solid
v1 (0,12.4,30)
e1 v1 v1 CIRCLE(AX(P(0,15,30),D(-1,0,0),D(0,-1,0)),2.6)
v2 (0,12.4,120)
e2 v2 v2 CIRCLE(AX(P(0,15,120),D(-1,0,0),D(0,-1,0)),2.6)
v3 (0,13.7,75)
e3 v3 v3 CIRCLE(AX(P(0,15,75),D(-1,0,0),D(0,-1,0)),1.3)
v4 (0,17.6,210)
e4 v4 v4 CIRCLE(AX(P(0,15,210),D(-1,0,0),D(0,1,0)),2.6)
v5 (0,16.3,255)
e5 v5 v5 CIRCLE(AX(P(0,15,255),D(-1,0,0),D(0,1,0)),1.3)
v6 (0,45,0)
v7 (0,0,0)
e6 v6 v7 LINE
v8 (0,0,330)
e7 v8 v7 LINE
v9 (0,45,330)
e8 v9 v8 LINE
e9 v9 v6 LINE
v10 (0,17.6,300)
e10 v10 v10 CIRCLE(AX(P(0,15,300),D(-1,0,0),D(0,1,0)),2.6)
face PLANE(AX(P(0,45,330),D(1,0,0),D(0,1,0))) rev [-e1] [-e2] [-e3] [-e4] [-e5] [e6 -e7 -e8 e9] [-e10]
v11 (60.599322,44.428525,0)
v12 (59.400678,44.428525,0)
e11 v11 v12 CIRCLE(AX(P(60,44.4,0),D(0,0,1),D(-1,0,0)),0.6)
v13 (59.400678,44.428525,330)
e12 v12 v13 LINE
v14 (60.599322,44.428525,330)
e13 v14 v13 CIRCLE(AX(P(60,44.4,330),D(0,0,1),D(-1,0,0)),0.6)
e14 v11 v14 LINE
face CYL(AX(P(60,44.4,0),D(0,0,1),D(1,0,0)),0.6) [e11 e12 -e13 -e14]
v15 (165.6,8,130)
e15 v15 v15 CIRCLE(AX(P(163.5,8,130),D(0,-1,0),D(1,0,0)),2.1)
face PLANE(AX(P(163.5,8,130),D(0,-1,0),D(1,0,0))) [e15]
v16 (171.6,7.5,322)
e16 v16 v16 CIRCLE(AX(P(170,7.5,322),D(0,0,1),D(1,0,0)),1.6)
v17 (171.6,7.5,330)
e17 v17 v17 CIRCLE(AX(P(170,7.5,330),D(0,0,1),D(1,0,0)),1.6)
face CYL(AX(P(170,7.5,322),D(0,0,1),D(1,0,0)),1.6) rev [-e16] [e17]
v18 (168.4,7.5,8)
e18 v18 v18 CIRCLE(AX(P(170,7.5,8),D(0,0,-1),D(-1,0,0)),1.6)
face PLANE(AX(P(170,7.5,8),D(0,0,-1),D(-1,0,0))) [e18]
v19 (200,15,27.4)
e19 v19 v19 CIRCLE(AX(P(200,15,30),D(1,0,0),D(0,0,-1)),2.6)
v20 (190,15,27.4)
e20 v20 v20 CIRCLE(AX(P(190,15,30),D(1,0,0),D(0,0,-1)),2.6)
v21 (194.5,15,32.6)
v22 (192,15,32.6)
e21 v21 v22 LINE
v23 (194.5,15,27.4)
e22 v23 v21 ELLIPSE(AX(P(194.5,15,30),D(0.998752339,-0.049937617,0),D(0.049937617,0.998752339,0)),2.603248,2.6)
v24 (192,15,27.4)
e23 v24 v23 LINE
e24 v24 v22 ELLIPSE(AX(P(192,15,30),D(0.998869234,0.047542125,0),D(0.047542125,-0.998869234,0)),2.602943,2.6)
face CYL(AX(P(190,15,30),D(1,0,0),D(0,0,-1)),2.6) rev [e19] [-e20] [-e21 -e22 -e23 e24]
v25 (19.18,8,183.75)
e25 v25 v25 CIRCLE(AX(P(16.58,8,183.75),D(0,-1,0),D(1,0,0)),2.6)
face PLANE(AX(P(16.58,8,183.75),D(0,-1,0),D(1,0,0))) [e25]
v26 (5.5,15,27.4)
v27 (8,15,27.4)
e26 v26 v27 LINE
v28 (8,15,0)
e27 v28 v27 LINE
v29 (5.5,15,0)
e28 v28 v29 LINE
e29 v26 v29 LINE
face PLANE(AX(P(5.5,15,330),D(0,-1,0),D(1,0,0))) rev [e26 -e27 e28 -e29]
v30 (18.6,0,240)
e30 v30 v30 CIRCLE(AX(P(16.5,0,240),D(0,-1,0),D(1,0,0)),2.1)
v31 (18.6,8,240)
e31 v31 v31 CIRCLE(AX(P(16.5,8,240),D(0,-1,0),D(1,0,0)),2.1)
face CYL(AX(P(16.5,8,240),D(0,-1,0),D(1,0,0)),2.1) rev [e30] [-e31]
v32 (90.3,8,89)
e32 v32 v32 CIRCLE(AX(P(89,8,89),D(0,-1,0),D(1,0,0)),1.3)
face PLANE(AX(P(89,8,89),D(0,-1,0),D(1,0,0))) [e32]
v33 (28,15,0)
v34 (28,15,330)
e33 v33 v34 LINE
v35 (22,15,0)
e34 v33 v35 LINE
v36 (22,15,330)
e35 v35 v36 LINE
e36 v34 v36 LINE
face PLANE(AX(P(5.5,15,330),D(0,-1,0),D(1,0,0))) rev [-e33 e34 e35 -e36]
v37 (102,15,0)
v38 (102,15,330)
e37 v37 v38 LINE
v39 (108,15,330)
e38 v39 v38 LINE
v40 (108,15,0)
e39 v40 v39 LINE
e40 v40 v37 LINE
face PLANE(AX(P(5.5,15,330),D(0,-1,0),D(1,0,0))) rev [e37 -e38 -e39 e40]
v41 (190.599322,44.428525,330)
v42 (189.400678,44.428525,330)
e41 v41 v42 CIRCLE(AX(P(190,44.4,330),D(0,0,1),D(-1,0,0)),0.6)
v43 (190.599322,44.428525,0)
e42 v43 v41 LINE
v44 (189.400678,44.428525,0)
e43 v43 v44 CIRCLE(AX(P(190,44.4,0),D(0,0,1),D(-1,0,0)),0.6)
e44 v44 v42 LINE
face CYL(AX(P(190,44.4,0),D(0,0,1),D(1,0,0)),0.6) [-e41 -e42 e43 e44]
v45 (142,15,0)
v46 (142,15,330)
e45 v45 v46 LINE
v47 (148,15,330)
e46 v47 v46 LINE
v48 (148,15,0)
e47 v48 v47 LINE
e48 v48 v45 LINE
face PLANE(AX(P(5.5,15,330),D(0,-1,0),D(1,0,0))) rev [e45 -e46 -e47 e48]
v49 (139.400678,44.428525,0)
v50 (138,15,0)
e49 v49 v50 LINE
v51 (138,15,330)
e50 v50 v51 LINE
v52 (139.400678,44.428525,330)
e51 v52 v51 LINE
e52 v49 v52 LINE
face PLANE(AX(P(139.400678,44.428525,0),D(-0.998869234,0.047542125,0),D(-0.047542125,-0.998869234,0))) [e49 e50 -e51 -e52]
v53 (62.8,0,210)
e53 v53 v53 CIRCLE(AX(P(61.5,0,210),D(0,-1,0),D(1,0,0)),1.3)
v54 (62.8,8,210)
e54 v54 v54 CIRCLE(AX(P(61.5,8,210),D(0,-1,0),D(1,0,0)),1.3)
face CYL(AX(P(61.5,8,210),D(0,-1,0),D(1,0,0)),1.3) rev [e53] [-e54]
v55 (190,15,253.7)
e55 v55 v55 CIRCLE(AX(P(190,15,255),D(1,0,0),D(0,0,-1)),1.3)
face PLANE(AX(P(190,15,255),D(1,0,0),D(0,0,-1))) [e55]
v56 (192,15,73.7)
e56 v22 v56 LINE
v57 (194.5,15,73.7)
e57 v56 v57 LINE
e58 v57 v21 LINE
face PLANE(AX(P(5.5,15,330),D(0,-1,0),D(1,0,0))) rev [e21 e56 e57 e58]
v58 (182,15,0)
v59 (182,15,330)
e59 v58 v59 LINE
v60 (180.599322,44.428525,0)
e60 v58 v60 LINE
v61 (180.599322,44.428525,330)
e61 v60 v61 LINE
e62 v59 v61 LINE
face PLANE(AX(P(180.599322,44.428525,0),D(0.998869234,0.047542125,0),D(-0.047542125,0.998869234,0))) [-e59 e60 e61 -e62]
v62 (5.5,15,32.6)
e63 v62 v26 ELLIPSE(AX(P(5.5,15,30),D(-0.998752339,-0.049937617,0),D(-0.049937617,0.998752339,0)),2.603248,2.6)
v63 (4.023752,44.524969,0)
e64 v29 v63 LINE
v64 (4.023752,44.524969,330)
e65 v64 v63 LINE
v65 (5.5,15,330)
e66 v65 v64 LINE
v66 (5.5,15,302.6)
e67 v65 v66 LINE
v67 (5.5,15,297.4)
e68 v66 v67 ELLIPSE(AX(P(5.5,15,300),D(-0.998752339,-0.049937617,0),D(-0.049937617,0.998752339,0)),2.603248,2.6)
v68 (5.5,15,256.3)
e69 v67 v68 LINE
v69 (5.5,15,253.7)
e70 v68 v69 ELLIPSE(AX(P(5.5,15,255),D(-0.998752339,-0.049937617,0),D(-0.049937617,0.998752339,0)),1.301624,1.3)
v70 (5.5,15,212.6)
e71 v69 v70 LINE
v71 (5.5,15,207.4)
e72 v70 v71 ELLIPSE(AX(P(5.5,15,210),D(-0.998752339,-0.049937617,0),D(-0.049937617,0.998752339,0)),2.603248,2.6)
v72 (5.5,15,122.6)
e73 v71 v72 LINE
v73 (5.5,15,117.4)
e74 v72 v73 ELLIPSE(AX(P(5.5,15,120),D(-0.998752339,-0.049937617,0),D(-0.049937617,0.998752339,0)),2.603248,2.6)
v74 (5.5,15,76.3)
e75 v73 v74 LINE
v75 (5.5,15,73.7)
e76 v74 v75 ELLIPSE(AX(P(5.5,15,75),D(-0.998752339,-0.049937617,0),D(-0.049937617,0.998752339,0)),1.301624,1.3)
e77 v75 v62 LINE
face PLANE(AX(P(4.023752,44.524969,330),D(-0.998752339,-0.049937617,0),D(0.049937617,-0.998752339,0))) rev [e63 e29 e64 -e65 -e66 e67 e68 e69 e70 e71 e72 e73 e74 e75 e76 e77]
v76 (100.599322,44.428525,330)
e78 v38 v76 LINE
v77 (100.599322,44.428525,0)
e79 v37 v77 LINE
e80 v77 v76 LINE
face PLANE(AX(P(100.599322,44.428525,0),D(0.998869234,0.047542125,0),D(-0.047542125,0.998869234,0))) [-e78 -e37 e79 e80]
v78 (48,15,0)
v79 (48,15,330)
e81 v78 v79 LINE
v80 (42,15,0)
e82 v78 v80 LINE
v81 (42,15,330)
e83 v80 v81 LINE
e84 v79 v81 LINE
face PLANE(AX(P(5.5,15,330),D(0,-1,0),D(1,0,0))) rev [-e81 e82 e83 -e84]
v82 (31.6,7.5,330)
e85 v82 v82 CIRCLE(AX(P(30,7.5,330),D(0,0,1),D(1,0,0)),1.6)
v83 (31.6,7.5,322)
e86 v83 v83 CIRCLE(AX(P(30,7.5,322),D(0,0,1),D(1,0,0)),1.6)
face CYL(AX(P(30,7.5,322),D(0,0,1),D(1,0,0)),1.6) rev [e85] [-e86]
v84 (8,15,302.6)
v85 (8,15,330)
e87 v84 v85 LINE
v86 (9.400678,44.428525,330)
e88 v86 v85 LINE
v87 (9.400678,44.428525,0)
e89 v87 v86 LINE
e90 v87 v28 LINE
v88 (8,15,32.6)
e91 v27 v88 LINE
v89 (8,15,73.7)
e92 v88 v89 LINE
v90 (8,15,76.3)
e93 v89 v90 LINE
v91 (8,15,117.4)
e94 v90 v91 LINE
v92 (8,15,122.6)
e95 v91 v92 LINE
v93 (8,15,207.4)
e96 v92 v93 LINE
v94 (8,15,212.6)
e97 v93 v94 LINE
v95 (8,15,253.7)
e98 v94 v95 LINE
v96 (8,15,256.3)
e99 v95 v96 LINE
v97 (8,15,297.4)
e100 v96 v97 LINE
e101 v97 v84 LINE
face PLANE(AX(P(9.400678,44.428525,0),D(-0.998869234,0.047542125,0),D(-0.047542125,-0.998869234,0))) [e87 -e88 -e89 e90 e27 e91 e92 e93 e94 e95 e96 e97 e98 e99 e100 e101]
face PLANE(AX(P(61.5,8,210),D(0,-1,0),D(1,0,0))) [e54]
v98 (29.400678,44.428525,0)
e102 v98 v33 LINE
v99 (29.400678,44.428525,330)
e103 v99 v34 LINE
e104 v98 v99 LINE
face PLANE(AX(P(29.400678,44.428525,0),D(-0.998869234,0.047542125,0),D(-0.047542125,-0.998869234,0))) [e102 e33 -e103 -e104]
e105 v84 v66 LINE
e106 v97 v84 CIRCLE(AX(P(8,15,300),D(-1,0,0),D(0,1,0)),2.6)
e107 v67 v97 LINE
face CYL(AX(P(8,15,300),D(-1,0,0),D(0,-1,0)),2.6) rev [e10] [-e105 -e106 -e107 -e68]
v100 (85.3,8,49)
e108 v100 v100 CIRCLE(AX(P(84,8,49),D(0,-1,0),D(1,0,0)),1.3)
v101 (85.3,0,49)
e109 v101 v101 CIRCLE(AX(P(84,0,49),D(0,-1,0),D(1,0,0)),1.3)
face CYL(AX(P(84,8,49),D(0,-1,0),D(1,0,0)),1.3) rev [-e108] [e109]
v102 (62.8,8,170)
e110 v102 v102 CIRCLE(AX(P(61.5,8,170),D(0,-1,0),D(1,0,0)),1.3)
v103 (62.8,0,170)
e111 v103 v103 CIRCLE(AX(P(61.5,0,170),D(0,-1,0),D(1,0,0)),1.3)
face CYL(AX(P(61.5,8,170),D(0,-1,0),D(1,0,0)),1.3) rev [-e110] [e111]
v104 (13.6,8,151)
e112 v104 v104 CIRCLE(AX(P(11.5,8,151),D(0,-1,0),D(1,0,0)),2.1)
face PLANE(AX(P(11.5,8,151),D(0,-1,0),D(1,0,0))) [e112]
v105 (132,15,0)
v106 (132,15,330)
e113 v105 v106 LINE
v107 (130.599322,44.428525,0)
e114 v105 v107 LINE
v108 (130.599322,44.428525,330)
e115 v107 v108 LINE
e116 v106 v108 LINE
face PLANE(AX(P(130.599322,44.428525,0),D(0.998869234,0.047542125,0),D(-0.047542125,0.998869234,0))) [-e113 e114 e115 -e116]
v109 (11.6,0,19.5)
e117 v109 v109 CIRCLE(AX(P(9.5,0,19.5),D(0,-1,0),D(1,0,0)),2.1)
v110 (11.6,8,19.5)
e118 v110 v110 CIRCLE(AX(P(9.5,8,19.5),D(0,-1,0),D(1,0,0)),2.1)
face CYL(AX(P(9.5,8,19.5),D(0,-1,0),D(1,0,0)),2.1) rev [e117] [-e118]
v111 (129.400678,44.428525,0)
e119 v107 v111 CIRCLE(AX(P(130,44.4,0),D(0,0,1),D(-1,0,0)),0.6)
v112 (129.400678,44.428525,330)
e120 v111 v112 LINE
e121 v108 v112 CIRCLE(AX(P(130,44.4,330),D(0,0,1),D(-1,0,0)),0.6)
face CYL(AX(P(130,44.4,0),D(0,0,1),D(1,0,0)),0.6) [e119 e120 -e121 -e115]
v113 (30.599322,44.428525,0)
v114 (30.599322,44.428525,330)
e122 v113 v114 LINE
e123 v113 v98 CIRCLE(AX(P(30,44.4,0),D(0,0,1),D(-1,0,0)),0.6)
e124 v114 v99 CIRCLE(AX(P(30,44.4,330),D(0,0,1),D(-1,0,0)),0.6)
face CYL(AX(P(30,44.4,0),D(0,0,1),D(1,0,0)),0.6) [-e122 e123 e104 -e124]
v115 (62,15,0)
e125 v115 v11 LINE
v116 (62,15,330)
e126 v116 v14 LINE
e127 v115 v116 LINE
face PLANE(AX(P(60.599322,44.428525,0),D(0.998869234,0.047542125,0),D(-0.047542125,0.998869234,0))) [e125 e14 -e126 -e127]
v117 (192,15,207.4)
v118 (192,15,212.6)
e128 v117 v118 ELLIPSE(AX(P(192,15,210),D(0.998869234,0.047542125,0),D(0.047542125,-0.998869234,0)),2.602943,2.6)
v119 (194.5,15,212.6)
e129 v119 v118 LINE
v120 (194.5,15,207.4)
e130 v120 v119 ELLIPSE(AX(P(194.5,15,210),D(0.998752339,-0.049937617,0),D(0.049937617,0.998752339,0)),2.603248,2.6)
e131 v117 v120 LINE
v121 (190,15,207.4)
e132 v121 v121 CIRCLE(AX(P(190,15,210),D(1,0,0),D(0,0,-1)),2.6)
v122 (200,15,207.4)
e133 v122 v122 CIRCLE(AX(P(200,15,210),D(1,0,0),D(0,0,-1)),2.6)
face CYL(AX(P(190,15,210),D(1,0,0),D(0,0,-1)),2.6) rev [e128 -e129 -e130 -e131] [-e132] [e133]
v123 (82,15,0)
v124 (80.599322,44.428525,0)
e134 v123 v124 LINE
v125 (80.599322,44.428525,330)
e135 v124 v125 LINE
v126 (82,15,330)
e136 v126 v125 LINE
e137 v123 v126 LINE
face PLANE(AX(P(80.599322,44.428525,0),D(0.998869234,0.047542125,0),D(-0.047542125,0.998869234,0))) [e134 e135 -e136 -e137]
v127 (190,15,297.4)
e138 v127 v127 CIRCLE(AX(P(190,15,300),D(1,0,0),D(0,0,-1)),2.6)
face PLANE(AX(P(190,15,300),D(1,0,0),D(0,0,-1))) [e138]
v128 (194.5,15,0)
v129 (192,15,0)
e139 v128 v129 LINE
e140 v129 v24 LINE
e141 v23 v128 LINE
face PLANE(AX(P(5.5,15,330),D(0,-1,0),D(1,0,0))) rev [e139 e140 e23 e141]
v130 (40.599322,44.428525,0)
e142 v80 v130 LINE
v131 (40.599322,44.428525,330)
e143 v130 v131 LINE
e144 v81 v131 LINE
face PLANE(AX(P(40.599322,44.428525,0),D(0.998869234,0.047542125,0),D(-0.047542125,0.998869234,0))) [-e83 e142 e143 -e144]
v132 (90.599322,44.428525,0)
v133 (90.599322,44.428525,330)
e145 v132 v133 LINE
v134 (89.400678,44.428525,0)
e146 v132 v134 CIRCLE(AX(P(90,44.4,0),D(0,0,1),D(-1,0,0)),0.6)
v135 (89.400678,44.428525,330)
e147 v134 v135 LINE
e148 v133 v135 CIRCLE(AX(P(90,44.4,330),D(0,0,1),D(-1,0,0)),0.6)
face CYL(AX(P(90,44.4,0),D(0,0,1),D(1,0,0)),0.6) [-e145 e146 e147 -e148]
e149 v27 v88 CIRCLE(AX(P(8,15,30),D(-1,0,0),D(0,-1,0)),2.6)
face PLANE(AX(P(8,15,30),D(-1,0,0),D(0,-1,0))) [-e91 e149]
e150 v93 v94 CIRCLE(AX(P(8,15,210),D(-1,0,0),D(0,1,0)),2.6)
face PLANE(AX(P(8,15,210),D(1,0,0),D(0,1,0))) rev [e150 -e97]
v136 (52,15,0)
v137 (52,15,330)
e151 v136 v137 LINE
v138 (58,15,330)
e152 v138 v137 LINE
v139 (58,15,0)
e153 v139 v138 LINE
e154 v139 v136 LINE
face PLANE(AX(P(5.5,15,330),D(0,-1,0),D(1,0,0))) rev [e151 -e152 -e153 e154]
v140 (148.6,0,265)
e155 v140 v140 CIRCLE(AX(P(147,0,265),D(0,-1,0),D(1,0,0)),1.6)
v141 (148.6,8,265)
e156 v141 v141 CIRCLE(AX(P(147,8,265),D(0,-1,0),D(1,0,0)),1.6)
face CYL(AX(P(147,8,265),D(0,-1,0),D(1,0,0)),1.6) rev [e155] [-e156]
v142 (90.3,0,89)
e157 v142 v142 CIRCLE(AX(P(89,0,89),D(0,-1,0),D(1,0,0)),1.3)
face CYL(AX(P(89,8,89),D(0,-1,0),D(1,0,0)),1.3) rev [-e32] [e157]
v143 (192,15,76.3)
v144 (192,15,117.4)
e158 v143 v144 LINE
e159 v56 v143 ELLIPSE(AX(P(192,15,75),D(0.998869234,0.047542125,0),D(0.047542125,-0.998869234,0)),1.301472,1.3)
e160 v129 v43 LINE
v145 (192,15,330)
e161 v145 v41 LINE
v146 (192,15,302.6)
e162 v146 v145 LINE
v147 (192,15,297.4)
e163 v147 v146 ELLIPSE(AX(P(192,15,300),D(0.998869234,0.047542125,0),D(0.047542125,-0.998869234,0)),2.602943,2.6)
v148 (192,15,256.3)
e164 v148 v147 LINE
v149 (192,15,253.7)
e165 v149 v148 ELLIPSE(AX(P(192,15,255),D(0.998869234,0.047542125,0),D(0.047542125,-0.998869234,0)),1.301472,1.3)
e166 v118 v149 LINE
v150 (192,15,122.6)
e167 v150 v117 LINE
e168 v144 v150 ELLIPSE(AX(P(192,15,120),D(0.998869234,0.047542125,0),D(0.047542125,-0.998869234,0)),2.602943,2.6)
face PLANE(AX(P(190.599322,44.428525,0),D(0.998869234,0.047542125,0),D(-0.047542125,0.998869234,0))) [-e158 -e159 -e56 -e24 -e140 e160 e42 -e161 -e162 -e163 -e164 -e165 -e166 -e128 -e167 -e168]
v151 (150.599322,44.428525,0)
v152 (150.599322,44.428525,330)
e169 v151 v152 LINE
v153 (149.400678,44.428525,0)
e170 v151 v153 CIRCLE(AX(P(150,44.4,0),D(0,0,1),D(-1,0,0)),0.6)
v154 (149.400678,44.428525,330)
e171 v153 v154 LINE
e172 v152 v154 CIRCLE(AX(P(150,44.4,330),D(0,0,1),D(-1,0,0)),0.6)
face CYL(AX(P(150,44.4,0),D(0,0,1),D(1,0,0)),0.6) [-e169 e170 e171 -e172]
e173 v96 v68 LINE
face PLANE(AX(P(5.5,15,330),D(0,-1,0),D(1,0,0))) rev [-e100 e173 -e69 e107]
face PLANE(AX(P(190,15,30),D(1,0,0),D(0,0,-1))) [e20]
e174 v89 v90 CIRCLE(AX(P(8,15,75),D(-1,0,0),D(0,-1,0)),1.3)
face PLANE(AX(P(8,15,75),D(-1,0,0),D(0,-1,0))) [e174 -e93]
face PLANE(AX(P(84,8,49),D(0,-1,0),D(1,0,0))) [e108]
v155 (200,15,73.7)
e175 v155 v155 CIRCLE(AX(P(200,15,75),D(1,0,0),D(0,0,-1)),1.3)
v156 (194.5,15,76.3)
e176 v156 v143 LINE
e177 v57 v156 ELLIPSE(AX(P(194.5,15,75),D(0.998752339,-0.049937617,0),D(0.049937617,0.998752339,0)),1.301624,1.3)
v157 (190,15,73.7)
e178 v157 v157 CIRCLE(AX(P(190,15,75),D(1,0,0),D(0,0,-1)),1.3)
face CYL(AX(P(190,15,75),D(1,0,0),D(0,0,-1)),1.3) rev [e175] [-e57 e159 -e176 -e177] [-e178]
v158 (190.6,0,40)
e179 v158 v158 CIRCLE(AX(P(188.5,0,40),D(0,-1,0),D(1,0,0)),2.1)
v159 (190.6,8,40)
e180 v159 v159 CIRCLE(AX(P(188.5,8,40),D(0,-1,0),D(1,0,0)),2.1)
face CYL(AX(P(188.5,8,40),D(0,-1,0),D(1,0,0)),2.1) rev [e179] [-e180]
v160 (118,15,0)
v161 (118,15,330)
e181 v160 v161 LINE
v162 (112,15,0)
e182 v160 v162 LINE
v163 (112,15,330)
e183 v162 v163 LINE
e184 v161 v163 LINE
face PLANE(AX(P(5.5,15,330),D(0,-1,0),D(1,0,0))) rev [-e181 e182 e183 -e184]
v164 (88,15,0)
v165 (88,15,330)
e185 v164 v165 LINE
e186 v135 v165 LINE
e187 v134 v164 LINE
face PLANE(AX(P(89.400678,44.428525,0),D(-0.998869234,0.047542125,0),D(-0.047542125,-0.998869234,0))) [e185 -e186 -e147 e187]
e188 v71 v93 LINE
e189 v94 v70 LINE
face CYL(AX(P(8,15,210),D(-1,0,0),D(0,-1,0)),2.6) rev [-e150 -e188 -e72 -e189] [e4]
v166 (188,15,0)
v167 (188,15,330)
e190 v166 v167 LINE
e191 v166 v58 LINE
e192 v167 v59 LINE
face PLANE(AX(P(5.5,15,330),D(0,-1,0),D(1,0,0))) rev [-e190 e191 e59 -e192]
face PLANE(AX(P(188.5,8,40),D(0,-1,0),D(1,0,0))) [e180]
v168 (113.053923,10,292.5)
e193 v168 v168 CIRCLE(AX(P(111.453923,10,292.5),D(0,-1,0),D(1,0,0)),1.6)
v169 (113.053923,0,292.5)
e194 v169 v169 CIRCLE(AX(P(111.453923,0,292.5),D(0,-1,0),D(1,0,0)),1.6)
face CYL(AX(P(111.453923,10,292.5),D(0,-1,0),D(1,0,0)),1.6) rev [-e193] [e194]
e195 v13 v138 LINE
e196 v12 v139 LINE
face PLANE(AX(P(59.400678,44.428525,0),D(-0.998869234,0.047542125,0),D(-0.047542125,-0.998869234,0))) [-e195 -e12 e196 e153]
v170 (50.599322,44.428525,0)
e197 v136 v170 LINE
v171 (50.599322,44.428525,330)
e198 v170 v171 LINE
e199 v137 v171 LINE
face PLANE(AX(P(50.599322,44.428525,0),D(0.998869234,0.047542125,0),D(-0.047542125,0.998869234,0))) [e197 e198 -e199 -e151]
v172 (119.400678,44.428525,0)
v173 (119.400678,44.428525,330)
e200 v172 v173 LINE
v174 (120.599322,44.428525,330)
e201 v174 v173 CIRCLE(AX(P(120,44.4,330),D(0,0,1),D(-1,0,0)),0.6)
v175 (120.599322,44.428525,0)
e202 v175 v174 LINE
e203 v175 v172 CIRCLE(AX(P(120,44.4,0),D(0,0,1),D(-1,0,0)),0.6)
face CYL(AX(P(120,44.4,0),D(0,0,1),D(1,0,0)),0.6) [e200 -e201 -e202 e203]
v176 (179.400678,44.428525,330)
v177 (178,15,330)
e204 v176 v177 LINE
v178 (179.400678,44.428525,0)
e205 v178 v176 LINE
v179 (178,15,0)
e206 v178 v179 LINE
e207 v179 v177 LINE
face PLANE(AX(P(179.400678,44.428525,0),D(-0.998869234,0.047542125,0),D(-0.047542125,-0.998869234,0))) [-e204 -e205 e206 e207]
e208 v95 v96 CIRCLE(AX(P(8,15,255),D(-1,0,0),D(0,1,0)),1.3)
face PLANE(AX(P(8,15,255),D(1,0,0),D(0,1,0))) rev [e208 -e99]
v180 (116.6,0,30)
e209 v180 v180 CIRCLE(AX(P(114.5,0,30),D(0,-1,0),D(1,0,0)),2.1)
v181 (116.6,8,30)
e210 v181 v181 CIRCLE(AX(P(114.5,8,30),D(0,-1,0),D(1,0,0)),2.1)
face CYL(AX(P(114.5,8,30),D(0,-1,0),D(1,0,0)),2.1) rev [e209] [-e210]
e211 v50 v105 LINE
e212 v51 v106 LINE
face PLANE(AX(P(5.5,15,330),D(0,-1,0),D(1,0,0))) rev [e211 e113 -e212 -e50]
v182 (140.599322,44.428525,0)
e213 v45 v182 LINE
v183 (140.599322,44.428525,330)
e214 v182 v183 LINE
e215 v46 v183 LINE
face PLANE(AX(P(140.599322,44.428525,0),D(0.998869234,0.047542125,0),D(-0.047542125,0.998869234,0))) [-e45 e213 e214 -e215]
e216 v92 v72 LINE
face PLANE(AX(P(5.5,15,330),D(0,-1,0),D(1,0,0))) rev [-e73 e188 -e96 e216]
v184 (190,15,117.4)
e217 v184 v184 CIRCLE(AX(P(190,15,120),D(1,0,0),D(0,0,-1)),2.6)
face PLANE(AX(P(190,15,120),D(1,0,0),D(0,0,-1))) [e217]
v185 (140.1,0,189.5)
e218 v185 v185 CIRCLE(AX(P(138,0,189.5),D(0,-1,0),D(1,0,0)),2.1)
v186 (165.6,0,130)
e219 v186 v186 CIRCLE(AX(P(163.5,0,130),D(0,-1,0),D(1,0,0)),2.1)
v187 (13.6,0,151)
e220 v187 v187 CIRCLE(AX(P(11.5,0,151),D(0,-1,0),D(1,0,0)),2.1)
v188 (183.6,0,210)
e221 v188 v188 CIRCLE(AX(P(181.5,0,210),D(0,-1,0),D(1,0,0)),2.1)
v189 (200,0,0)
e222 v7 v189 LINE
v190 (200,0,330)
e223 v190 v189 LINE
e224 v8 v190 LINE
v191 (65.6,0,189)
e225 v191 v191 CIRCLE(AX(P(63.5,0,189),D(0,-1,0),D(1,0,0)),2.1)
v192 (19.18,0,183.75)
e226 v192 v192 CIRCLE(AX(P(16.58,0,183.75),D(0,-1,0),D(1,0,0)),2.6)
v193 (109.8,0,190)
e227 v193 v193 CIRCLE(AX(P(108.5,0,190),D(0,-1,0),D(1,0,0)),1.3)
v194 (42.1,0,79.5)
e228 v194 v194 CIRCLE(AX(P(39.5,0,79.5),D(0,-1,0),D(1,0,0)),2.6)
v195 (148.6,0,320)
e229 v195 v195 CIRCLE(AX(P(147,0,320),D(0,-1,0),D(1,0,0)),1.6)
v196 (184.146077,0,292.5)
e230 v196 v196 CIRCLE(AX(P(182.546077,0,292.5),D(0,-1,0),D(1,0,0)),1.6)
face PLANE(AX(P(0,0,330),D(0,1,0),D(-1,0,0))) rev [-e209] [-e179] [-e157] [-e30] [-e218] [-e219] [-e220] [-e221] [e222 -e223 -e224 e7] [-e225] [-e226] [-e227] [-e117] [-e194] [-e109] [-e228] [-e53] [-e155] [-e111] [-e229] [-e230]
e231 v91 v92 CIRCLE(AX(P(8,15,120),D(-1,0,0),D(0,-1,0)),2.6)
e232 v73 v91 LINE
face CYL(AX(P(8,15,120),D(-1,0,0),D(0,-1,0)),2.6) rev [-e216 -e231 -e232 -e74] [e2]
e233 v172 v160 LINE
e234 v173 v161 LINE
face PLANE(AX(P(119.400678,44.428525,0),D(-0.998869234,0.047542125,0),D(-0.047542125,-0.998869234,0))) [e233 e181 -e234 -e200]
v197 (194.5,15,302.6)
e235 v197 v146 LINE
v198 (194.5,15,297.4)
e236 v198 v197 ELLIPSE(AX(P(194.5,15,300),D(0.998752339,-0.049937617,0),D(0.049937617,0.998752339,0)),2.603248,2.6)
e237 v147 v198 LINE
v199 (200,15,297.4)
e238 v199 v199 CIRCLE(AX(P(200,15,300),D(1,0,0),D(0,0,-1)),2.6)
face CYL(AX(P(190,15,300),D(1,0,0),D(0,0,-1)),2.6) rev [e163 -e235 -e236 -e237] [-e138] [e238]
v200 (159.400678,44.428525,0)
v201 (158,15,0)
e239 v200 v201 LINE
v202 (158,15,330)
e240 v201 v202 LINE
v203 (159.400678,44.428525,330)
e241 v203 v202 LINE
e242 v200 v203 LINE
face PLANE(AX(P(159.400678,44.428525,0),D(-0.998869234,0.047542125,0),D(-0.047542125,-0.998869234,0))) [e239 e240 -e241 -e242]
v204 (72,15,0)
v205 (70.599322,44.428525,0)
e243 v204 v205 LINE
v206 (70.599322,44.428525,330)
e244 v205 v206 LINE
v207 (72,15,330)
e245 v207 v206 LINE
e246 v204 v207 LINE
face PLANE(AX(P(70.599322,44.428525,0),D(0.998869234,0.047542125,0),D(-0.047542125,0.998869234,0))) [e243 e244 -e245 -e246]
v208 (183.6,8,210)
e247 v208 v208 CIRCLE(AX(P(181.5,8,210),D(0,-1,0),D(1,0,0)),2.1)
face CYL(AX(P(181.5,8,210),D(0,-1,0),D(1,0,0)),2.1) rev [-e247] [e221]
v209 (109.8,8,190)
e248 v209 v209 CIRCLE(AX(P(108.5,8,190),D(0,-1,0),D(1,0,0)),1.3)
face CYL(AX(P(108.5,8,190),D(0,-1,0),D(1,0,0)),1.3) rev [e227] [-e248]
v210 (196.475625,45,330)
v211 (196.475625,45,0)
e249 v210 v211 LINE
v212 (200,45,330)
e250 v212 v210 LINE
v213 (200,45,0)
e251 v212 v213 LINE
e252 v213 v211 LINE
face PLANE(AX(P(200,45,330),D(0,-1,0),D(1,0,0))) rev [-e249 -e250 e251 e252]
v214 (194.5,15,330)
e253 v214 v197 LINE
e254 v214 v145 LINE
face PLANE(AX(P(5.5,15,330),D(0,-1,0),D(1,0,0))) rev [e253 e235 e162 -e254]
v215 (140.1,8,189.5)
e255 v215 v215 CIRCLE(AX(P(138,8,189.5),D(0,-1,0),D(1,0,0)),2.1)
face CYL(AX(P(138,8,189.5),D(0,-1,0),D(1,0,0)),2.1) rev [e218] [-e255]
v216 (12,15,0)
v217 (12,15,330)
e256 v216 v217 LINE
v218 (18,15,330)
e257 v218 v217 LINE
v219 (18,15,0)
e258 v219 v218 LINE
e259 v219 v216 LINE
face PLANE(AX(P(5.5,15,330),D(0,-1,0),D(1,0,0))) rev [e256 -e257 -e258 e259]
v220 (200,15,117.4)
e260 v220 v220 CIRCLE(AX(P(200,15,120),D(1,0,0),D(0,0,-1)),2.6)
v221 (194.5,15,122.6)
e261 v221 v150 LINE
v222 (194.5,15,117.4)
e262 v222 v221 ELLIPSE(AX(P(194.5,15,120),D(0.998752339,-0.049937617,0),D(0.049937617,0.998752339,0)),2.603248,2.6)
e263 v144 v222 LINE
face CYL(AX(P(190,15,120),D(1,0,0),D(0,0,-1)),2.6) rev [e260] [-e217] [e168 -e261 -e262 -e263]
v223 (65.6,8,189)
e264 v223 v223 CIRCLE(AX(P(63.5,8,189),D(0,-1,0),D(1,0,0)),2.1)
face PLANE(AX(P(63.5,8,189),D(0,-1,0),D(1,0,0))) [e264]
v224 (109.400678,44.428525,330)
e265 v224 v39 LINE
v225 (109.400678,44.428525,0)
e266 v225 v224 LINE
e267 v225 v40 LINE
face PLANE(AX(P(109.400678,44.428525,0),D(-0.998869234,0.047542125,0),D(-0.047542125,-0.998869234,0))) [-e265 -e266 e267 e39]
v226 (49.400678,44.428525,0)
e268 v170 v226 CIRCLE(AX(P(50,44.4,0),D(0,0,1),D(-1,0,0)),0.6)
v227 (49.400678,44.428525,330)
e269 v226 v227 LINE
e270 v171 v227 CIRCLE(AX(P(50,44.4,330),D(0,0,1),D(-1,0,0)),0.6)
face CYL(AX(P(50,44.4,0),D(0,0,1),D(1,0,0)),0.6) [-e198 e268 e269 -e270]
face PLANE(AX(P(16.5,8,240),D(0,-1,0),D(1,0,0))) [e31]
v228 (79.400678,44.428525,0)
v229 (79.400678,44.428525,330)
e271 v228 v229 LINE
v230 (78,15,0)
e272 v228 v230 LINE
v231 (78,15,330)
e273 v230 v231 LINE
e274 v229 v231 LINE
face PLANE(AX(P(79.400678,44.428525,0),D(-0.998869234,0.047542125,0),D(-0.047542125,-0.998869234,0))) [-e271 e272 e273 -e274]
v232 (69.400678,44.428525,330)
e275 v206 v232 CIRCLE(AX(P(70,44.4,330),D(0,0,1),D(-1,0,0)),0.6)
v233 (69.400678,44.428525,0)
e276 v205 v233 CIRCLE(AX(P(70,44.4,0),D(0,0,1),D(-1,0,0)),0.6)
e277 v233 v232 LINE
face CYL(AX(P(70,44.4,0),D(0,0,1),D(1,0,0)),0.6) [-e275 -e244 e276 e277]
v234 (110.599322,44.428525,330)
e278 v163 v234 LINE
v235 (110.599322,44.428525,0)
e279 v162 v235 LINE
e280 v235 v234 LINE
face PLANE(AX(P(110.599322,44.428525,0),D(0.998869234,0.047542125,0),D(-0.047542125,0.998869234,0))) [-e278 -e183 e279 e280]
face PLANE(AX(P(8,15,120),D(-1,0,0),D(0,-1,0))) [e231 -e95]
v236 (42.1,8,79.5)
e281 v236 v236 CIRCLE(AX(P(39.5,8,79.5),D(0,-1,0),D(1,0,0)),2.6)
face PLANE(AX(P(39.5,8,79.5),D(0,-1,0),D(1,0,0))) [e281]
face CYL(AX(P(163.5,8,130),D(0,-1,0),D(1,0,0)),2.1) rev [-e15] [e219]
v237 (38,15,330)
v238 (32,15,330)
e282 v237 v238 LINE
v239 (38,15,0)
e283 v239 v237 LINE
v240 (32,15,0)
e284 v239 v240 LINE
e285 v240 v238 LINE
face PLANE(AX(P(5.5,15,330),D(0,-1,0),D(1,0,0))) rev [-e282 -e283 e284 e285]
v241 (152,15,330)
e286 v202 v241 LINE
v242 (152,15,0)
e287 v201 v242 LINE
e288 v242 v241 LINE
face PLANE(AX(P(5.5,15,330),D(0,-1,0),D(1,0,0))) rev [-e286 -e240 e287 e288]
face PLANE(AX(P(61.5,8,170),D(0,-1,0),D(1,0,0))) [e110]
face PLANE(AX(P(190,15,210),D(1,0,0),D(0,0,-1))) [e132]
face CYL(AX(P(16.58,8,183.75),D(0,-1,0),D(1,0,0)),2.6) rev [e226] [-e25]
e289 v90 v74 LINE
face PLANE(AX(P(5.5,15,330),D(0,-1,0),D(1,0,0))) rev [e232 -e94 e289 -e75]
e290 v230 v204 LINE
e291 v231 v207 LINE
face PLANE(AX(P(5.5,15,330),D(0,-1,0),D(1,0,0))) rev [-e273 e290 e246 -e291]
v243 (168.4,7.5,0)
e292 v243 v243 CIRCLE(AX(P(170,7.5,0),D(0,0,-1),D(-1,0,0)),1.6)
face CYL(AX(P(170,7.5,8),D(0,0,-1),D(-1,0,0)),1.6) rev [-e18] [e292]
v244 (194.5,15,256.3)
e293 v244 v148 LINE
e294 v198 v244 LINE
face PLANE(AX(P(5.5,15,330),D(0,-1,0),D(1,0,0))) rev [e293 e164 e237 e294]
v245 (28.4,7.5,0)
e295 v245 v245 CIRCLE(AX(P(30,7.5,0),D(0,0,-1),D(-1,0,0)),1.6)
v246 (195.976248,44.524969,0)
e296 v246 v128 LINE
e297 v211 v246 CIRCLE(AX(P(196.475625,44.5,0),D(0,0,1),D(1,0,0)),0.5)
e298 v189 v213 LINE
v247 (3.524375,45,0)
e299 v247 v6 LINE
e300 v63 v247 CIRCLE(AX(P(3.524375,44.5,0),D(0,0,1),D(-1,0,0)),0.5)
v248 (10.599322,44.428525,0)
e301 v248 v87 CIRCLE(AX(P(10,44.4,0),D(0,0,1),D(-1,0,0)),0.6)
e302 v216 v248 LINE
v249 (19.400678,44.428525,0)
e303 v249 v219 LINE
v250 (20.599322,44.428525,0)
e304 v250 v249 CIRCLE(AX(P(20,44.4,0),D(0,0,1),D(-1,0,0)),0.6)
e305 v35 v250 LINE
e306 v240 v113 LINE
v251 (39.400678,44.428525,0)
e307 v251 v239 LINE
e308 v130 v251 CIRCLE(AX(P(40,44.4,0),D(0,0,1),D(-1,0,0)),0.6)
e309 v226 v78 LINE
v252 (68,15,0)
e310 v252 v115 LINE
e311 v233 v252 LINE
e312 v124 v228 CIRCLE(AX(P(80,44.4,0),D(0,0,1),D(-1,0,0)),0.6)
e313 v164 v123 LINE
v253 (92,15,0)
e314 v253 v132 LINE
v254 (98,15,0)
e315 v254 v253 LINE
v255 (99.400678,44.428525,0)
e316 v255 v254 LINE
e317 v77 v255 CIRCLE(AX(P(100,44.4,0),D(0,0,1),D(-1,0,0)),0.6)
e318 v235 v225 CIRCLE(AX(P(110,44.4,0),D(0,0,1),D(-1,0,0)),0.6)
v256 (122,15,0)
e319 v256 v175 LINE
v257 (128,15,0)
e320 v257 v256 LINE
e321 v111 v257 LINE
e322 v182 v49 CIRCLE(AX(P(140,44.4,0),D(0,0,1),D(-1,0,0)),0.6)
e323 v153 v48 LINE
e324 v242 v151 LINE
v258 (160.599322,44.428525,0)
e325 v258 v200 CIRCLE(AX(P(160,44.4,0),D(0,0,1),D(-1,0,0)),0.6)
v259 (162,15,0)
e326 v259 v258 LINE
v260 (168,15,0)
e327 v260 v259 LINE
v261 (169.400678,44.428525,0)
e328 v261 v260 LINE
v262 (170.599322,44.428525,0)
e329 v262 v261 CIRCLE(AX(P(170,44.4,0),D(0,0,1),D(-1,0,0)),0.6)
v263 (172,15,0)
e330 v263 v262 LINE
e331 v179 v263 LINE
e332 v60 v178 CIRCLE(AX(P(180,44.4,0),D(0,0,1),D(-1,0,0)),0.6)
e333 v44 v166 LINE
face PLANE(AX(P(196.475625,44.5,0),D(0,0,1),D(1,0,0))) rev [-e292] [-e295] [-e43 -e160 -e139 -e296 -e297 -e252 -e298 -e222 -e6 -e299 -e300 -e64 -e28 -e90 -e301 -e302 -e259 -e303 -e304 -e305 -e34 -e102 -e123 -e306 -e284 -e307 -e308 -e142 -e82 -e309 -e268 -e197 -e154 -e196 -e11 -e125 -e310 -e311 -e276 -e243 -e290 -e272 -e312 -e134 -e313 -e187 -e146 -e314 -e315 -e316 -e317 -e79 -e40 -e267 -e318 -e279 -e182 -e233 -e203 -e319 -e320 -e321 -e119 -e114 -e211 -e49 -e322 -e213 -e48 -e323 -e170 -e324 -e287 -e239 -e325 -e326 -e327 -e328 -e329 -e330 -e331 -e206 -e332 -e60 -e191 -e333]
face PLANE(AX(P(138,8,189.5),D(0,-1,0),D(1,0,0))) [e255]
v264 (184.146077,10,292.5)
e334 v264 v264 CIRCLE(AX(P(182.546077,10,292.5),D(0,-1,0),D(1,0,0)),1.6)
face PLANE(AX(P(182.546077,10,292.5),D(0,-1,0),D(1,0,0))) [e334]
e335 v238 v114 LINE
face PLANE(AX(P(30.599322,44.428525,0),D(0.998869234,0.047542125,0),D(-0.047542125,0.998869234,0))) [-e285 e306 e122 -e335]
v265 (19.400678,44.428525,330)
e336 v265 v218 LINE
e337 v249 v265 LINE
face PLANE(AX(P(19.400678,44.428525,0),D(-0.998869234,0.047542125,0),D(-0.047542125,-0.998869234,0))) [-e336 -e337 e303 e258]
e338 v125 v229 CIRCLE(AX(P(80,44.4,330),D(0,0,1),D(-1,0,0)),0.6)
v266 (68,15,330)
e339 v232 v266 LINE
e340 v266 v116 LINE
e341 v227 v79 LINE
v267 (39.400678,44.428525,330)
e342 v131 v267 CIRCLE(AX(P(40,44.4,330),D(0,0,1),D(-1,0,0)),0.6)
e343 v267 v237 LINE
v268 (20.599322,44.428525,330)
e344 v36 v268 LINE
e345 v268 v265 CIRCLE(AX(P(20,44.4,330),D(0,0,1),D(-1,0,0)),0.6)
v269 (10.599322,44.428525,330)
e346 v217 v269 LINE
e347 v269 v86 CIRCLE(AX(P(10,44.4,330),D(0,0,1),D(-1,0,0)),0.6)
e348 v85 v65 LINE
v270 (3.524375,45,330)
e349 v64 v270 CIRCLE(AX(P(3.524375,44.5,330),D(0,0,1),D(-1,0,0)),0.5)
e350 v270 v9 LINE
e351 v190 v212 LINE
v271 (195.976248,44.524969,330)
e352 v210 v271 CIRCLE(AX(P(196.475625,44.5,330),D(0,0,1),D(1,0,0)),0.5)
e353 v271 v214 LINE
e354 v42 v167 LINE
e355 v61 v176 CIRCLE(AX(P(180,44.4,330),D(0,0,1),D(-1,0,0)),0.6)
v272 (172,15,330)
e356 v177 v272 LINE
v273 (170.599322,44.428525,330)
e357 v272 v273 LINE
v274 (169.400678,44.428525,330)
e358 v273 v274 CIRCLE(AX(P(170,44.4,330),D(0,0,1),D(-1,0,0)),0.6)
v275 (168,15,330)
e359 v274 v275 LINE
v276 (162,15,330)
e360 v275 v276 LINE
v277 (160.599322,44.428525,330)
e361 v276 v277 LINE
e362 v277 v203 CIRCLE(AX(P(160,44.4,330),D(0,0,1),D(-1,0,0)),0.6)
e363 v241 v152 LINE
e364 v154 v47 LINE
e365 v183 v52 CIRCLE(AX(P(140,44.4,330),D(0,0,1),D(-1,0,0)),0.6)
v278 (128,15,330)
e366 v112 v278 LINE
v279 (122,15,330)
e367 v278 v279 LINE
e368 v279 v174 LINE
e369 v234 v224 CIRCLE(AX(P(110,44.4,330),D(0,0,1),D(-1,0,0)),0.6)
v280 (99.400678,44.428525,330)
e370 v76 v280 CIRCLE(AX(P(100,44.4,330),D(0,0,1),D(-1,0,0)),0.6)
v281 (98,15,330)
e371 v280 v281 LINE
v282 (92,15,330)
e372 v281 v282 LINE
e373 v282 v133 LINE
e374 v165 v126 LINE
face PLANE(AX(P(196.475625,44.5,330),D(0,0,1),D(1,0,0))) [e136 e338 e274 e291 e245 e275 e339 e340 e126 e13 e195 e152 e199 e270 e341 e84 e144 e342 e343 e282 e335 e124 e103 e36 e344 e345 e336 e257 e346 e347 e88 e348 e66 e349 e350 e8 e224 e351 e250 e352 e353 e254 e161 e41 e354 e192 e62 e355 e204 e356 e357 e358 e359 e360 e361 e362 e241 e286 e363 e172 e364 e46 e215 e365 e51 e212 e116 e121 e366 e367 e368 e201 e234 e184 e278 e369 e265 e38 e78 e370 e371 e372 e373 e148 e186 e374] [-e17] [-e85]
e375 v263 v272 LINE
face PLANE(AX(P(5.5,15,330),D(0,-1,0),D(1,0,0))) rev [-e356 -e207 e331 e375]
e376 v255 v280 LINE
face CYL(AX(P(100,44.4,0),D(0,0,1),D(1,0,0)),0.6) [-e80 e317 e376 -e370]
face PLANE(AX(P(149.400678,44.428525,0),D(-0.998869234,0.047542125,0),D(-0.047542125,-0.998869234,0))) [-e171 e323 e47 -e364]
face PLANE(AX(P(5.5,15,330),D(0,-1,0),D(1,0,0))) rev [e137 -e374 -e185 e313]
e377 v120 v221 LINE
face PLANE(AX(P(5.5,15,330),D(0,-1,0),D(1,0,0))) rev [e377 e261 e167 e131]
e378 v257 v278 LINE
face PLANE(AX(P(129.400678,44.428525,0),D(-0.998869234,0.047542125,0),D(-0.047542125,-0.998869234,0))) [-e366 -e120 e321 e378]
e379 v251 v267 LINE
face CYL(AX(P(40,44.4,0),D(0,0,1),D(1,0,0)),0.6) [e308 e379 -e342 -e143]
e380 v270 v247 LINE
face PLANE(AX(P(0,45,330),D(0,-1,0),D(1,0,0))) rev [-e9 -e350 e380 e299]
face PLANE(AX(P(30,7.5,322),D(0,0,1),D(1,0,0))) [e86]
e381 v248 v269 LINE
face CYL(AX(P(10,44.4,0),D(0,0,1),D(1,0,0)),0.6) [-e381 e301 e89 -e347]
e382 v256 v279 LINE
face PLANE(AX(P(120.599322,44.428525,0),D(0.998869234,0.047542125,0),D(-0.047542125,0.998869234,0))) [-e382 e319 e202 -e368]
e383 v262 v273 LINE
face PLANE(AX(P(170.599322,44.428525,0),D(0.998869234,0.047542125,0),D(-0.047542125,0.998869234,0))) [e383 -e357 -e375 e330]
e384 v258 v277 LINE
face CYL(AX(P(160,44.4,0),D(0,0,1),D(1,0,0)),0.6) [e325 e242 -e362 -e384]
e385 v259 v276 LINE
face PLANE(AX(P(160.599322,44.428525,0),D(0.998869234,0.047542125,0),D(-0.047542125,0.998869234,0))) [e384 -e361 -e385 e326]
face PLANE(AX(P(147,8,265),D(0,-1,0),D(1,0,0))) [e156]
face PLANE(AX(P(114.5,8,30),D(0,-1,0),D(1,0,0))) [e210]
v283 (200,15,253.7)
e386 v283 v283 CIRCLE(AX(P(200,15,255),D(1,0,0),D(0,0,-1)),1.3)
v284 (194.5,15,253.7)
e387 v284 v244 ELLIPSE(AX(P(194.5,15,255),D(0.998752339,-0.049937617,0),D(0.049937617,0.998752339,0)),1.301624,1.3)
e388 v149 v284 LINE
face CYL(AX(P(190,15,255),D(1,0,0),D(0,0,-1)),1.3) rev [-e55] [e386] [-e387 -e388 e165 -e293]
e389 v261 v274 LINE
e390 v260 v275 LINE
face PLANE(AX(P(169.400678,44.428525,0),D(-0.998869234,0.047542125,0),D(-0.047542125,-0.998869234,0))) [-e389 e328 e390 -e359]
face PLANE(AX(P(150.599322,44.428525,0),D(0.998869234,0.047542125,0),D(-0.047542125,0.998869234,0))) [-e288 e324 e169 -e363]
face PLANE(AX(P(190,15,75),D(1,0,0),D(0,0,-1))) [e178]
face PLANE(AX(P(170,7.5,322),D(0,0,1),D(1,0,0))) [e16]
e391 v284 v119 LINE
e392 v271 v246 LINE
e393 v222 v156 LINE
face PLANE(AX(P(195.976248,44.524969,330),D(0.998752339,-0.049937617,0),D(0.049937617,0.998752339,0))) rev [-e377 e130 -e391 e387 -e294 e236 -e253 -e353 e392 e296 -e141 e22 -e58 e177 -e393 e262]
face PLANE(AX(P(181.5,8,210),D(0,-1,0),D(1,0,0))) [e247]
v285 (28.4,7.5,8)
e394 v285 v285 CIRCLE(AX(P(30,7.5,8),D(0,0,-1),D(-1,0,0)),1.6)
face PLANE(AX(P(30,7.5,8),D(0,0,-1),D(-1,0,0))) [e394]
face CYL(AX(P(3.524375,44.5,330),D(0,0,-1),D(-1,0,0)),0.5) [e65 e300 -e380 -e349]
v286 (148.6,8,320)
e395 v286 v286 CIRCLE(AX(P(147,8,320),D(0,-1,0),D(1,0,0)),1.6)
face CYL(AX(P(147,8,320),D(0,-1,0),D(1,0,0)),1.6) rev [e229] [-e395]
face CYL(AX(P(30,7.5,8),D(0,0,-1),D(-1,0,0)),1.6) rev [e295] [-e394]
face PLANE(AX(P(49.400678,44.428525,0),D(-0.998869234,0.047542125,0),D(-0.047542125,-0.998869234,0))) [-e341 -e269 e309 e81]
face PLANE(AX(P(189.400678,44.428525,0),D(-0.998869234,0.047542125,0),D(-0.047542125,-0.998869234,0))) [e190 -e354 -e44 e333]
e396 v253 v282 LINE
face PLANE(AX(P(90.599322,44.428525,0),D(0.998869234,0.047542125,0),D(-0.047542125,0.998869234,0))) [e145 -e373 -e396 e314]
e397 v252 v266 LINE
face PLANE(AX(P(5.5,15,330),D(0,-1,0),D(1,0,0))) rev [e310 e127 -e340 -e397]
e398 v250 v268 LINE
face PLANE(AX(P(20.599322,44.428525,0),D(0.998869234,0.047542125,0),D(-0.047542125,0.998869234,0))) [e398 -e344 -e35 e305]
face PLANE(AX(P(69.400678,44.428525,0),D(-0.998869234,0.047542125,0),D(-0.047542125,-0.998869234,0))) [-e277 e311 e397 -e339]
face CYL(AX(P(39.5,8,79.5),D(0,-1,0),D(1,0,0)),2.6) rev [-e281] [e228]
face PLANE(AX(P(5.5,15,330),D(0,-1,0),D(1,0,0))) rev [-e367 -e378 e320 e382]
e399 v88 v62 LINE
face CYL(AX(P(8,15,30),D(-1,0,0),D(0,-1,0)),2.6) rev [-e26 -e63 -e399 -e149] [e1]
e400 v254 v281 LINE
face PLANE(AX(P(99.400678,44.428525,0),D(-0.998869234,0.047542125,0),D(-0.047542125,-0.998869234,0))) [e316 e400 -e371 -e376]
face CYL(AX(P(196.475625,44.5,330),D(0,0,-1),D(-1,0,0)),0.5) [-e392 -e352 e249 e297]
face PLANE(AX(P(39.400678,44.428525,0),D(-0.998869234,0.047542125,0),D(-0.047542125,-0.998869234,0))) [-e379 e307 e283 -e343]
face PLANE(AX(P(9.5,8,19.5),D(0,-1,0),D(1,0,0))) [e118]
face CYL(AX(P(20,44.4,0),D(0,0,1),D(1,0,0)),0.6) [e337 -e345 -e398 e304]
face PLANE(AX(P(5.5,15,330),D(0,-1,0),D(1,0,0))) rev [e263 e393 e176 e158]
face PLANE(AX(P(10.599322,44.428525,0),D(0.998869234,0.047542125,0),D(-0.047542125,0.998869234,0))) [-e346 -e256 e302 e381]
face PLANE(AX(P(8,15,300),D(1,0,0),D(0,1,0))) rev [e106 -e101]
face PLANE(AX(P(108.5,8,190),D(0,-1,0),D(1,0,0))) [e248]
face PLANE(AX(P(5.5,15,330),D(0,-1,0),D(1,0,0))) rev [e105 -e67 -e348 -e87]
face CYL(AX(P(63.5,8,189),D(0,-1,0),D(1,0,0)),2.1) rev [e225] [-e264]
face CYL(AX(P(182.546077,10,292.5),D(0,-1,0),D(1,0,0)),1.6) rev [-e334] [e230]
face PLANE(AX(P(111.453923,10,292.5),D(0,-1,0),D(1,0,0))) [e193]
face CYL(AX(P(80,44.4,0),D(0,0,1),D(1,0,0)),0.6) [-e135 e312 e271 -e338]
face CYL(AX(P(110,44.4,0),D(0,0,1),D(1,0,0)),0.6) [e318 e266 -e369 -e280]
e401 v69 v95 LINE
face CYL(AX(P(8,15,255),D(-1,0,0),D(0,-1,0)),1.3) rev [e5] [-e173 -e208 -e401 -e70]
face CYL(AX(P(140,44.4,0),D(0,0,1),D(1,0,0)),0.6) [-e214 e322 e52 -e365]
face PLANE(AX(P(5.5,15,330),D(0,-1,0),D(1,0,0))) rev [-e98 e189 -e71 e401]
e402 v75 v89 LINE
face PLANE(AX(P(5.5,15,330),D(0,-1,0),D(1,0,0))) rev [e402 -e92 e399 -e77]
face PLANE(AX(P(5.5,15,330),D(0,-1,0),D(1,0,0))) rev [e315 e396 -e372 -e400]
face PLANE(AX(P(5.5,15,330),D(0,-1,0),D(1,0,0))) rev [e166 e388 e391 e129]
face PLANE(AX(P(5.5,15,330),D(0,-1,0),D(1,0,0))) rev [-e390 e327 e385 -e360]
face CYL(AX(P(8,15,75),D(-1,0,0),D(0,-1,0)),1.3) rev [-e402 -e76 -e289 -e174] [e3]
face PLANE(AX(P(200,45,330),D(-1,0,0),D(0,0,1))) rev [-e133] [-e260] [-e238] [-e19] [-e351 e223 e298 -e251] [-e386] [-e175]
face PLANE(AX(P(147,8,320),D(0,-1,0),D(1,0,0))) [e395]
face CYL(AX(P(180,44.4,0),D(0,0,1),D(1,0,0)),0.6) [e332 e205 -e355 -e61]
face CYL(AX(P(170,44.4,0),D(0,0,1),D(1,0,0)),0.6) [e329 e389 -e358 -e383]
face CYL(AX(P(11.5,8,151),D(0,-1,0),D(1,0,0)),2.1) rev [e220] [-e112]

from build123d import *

# Parameters (mm, degrees)
EXTRUDE_1_DEPTH       = 330
EXTRUDE_3_DEPTH       = 330
PATTERN_CURVE_1_COUNT = 19
PATTERN_CURVE_1_PITCH = 10
SKETCH_3_R            = 2.1
SKETCH_3_R_2          = 2.6
SKETCH_3_R_3          = 1.3
CUT_EXTRUDE_1_DEPTH   = 8
SKETCH_4_R            = 2.6
SKETCH_4_R_2          = 1.3
CUT_EXTRUDE_2_DEPTH   = 8
CUT_EXTRUDE_START     = -10
SKETCH_6_R            = 2.6
SKETCH_6_R_2          = 1.3
CUT_EXTRUDE_5_DEPTH   = 10
SKETCH_7_R            = 1.6
CUT_EXTRUDE_6_DEPTH   = 8
CUT_EXTRUDE_START_2   = -8
SKETCH_8_R            = 1.6
CUT_EXTRUDE_7_DEPTH   = 8
SKETCH_9_R            = 1.6
CUT_EXTRUDE_8_DEPTH   = 8
SKETCH_10_R           = 1.6
CUT_EXTRUDE_9_DEPTH   = 10


with BuildPart() as part:
    # Эскиз1 → Вытянуть1 (new body)
    with BuildSketch(Plane.XY):
        with BuildLine():
            Line((0, 45), (3.52437539, 45))
            ThreePointArc((3.52437539, 45), (3.868987923, 44.862273656), (4.02375156, 44.524968808))
            Line((4.02375156, 44.524968808), (5.5, 15))
            Line((5.5, 15), (194.5, 15))
            Line((194.5, 15), (195.97624844, 44.524968808))
            ThreePointArc((195.97624844, 44.524968808), (196.131012077, 44.862273656), (196.47562461, 45))
            Line((196.47562461, 45), (200, 45))
            Line((200, 45), (200, 0))
            Line((200, 0), (0, 0))
            Line((0, 0), (0, 45))
        make_face()
    extrude(amount=EXTRUDE_1_DEPTH)

    # Эскиз2 → Вытянуть3 (add)
    with BuildSketch(Plane.XY.offset(330)):
        with BuildLine():
            Line((9.40067846, 44.428525275), (8, 15))
            Line((8, 15), (12, 15))
            Line((12, 15), (10.59932154, 44.428525275))
            ThreePointArc((10.59932154, 44.428525275), (10, 45), (9.40067846, 44.428525275))
        make_face()
    extrude_3 = extrude(amount=-EXTRUDE_3_DEPTH)

    # Кривая1: Вытянуть3 ×19
    with Locations(*[(i * PATTERN_CURVE_1_PITCH, 0, 0) for i in range(1, PATTERN_CURVE_1_COUNT)]):
        add(extrude_3)

    # Эскиз3 → Вырез-Вытянуть1 (cut)
    with BuildSketch(Plane.XZ):
        with Locations((9.5, 19.5)):
            Circle(SKETCH_3_R)
        with Locations((188.5, 40)):
            Circle(SKETCH_3_R)
        with Locations((163.5, 130)):
            Circle(SKETCH_3_R)
        with Locations((11.5, 151)):
            Circle(SKETCH_3_R)
        with Locations((63.5, 189)):
            Circle(SKETCH_3_R)
        with Locations((16.5, 240)):
            Circle(SKETCH_3_R)
        with Locations((39.5, 79.5)):
            Circle(SKETCH_3_R_2)
        with Locations((114.5, 30)):
            Circle(SKETCH_3_R)
        with Locations((181.5, 210)):
            Circle(SKETCH_3_R)
        with Locations((16.58, 183.75)):
            Circle(SKETCH_3_R_2)
        with Locations((84, 49)):
            Circle(SKETCH_3_R_3)
        with Locations((89, 89)):
            Circle(SKETCH_3_R_3)
        with Locations((61.5, 170)):
            Circle(SKETCH_3_R_3)
        with Locations((61.5, 210)):
            Circle(SKETCH_3_R_3)
        with Locations((108.5, 190)):
            Circle(SKETCH_3_R_3)
        with Locations((138, 189.5)):
            Circle(SKETCH_3_R)
    extrude(amount=-CUT_EXTRUDE_1_DEPTH, mode=Mode.SUBTRACT)

    # Эскиз4 → Вырез-Вытянуть2 (cut)
    with BuildSketch(Plane.ZY):
        with Locations((30, 15)):
            Circle(SKETCH_4_R)
        with Locations((75, 15)):
            Circle(SKETCH_4_R_2)
        with Locations((120, 15)):
            Circle(SKETCH_4_R)
        with Locations((210, 15)):
            Circle(SKETCH_4_R)
        with Locations((255, 15)):
            Circle(SKETCH_4_R_2)
        with Locations((300, 15)):
            Circle(SKETCH_4_R)
    extrude(amount=-CUT_EXTRUDE_2_DEPTH, mode=Mode.SUBTRACT)

    # Эскиз6 → Вырез-Вытянуть5 (cut)
    with BuildSketch(Plane(origin=(200, 0, 0), x_dir=(0, 0, -1), z_dir=(1, 0, 0)).offset(CUT_EXTRUDE_START)):
        with Locations((-30, 15)):
            Circle(SKETCH_6_R)
        with Locations((-75, 15)):
            Circle(SKETCH_6_R_2)
        with Locations((-120, 15)):
            Circle(SKETCH_6_R)
        with Locations((-210, 15)):
            Circle(SKETCH_6_R)
        with Locations((-255, 15)):
            Circle(SKETCH_6_R_2)
        with Locations((-300, 15)):
            Circle(SKETCH_6_R)
    extrude(amount=CUT_EXTRUDE_5_DEPTH, mode=Mode.SUBTRACT)

    # Эскиз7 → Вырез-Вытянуть6 (cut)
    with BuildSketch(Plane.XY.offset(330)):
        with Locations((30, 7.5)):
            Circle(SKETCH_7_R)
        with Locations((170, 7.5)):
            Circle(SKETCH_7_R)
    extrude(amount=-CUT_EXTRUDE_6_DEPTH, mode=Mode.SUBTRACT)

    # Эскиз8 → Вырез-Вытянуть7 (cut)
    with BuildSketch(Plane(origin=(0, 0, 0), x_dir=(-1, 0, 0), z_dir=(0, 0, -1)).offset(CUT_EXTRUDE_START_2)):
        with Locations((-30, 7.5)):
            Circle(SKETCH_8_R)
        with Locations((-170, 7.5)):
            Circle(SKETCH_8_R)
    extrude(amount=CUT_EXTRUDE_7_DEPTH, mode=Mode.SUBTRACT)

    # Эскиз9 → Вырез-Вытянуть8 (cut)
    with BuildSketch(Plane.XZ):
        with Locations((147, 320)):
            Circle(SKETCH_9_R)
        with Locations((147, 265)):
            Circle(SKETCH_9_R)
    extrude(amount=-CUT_EXTRUDE_8_DEPTH, mode=Mode.SUBTRACT)

    # Эскиз10 → Вырез-Вытянуть9 (cut)
    with BuildSketch(Plane.XZ):
        with Locations((111.453923093, 292.5)):
            Circle(SKETCH_10_R)
        with Locations((182.546076907, 292.5)):
            Circle(SKETCH_10_R)
    extrude(amount=-CUT_EXTRUDE_9_DEPTH, mode=Mode.SUBTRACT)


solid = part.part
